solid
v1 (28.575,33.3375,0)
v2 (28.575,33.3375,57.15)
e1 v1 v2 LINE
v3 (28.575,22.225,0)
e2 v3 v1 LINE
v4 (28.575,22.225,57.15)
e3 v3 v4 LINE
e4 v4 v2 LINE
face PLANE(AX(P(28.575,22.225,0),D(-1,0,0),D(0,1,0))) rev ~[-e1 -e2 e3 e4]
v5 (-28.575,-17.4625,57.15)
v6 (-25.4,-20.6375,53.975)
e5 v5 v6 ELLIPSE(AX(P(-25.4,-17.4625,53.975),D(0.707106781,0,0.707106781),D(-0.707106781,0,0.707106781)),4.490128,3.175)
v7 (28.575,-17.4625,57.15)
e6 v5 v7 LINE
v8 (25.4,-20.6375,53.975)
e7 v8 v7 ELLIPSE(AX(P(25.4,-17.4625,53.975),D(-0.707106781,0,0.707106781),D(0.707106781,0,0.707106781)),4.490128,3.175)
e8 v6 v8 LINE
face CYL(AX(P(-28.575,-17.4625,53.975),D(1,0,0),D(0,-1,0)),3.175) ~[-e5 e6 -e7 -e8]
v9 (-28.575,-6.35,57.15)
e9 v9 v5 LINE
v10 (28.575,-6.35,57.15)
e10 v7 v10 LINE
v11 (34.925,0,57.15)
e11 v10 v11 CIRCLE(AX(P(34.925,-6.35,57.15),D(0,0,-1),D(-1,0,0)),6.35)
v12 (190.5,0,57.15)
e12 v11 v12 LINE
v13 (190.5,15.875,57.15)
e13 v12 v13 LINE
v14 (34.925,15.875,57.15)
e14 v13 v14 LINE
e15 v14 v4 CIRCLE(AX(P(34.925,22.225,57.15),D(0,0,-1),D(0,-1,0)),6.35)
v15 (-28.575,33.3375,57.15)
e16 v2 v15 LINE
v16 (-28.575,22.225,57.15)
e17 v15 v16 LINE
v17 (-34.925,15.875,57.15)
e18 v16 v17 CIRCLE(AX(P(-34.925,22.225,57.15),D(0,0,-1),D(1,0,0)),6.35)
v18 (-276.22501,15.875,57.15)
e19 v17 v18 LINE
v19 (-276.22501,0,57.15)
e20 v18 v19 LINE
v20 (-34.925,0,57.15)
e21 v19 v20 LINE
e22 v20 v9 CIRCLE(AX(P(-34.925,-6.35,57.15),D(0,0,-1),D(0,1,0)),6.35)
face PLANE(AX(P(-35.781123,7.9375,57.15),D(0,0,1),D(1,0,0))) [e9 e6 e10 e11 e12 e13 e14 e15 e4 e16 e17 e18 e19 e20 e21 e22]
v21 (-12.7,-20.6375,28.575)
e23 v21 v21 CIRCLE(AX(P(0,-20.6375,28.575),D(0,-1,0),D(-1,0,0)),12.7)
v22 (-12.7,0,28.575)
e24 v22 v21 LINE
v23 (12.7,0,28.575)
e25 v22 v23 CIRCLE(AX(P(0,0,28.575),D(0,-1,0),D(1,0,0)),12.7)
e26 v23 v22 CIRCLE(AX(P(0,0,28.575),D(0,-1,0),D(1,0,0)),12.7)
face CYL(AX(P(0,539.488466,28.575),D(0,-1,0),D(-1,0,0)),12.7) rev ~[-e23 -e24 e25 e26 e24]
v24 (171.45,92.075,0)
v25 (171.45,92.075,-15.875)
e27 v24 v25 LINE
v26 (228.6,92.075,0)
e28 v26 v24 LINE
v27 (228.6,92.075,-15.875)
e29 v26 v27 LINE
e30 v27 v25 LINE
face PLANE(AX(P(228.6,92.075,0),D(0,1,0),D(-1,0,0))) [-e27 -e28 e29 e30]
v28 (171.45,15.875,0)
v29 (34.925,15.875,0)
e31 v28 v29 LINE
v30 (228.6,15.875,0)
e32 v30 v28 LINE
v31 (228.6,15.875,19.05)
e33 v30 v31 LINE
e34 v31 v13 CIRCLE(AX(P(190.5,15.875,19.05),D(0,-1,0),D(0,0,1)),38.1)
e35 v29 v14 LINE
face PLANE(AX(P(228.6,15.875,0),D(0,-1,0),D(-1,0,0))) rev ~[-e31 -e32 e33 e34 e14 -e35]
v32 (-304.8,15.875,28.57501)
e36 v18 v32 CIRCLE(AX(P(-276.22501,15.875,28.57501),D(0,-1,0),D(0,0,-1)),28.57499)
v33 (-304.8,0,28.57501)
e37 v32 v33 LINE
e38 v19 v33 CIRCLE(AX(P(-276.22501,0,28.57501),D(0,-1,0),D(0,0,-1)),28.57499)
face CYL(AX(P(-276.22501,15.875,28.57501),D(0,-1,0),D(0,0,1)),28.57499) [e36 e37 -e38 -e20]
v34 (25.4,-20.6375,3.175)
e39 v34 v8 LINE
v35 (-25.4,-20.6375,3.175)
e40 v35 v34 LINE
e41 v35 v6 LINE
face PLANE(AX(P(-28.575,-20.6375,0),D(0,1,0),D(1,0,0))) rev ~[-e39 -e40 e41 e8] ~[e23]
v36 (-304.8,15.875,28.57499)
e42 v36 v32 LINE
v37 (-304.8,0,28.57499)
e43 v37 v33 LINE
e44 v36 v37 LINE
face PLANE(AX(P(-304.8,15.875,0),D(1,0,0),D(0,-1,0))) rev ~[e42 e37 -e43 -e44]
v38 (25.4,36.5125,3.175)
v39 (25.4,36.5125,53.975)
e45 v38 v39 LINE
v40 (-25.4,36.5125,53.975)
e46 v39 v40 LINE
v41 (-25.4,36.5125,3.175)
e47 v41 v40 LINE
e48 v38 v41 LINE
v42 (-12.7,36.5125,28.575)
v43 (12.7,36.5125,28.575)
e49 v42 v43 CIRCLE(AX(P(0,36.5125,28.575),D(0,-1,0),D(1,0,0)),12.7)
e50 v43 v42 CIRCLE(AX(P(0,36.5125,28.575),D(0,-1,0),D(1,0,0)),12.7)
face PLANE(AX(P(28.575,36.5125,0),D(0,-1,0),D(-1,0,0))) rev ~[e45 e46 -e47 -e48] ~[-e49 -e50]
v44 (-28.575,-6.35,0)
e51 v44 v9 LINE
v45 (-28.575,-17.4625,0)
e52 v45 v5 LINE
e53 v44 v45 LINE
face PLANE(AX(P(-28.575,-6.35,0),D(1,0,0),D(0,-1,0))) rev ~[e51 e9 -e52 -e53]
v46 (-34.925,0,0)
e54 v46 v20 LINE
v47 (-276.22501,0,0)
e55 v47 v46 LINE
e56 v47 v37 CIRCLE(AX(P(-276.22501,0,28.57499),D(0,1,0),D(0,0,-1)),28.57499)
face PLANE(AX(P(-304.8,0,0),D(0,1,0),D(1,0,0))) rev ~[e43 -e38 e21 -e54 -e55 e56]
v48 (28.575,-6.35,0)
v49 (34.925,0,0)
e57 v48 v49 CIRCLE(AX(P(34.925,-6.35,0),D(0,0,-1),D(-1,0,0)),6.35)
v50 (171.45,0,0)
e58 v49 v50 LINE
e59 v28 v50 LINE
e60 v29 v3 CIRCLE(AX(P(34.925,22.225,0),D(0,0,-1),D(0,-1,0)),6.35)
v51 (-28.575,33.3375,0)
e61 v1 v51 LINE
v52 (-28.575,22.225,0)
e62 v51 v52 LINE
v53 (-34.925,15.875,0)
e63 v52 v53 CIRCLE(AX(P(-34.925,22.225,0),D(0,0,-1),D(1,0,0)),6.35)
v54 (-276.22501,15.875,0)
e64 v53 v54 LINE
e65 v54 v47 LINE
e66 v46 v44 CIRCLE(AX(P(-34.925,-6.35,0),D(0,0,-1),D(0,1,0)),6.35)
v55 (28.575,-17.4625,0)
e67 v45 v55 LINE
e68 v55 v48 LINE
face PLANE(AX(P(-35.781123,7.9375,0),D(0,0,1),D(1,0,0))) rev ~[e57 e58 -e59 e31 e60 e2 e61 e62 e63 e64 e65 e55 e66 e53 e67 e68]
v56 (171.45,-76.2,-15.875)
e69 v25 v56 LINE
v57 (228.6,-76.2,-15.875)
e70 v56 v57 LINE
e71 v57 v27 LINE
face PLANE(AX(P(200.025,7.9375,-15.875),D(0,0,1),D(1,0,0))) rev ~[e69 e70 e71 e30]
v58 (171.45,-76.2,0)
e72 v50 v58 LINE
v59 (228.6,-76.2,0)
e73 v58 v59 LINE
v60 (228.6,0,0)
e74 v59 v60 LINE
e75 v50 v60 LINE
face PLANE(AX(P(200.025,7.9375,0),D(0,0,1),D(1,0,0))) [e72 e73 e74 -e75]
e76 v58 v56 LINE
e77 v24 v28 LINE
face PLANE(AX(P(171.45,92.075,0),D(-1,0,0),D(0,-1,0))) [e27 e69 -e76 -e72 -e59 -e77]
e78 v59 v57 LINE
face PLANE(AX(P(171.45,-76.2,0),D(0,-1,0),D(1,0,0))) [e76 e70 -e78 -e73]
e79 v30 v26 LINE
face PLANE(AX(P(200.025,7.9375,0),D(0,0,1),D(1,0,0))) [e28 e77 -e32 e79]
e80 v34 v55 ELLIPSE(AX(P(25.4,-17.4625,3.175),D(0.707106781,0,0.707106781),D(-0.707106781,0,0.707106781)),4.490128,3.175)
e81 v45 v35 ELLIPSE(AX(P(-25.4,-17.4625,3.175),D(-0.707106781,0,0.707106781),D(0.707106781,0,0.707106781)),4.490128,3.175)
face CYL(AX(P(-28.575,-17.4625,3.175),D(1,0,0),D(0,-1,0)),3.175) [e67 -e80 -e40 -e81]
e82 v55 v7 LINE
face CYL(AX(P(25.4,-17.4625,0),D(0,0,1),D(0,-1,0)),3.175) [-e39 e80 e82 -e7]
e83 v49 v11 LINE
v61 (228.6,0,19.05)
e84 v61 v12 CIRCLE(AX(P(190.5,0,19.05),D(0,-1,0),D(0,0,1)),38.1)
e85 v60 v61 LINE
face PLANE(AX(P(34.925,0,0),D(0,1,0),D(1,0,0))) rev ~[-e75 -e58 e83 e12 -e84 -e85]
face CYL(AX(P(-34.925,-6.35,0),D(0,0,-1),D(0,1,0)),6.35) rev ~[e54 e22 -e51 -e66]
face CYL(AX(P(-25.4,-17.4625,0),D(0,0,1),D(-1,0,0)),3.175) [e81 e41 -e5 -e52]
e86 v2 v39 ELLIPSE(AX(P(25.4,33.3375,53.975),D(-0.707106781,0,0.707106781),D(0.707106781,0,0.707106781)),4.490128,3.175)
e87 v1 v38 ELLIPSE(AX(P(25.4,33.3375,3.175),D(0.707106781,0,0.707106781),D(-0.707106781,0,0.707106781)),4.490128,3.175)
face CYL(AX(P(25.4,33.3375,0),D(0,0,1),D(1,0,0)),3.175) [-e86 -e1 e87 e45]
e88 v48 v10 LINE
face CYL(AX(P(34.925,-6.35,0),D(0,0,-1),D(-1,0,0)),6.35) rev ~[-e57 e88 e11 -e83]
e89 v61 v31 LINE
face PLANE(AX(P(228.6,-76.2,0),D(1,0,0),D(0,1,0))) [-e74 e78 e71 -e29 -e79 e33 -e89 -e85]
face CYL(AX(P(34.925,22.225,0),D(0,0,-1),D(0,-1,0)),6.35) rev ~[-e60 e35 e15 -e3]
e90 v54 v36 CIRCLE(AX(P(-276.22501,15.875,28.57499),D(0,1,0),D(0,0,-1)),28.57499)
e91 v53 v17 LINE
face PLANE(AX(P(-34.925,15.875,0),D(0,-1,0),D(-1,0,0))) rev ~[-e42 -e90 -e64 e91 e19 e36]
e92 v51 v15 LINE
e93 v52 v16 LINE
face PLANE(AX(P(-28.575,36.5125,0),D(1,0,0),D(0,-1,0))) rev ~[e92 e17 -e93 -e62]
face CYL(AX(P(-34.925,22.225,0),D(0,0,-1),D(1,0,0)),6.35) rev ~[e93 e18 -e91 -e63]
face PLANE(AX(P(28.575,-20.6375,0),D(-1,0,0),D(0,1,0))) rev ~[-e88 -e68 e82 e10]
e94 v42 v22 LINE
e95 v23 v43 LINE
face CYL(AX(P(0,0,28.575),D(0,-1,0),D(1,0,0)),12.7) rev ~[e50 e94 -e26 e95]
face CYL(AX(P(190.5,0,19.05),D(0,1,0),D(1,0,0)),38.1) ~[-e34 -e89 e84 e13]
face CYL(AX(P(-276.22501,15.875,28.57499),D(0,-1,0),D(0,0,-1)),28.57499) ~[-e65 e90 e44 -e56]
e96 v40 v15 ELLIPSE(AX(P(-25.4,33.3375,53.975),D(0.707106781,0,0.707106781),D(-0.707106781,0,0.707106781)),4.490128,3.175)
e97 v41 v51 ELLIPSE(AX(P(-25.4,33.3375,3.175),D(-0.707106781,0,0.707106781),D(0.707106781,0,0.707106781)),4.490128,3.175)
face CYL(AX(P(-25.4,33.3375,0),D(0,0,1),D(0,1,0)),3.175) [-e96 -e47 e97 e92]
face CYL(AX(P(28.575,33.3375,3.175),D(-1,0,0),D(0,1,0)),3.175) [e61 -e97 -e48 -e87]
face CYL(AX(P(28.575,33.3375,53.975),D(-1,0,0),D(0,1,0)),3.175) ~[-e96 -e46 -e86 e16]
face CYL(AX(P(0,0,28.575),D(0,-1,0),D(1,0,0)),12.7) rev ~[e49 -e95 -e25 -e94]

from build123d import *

# Parameters (mm, degrees)
F1_DEPTH = 57.15
F2_R     = 3.175
F3_R     = 28.57499
F5_D     = 25.4
F5_DEPTH = 38.1
F5_TIP   = 7.6309298617
F6_D     = 25.4
F7_R     = 38.1
F9_DEPTH = 15.875


# Not quite as in the source:
# - a fillet or chamfer is up to 0.001 mm smaller than in the source, because OpenCascade refuses the exact size
# - a length typed as a fraction of an inch, garbled in the dataset ("3 / 203.2 mm" for 3/8 in), is restored


with BuildPart() as f1:
    # F0 (on Top) → F1 (new body)
    with BuildSketch(Plane.XY):
        with BuildLine():
            ThreePointArc((28.575, -6.35), (30.4348719395, -1.8598719395), (34.925, 0))
            Line((34.925, 0), (228.6, 0))
            Line((228.6, 0), (228.6, 15.875))
            Line((228.6, 15.875), (34.925, 15.875))
            ThreePointArc((34.925, 15.875), (30.4348719395, 17.7348719395), (28.575, 22.225))
            Line((28.575, 22.225), (28.575, 36.5125))
            Line((28.575, 36.5125), (0, 36.5125))
            Line((0, 36.5125), (-28.575, 36.5125))
            Line((-28.575, 36.5125), (-28.575, 22.225))
            ThreePointArc((-28.575, 22.225), (-30.4348719395, 17.7348719395), (-34.925, 15.875))
            Line((-34.925, 15.875), (-304.8, 15.875))
            Line((-304.8, 15.875), (-304.8, 0))
            Line((-304.8, 0), (-34.925, 0))
            ThreePointArc((-34.925, 0), (-30.4348719395, -1.8598719395), (-28.575, -6.35))
            Line((-28.575, -6.35), (-28.575, -20.6375))
            Line((-28.575, -20.6375), (0, -20.6375))
            Line((0, -20.6375), (28.575, -20.6375))
            Line((28.575, -20.6375), (28.575, -6.35))
        make_face()
    extrude(amount=F1_DEPTH)

    # F2
    f2_edges = [f1.edges().sort_by_distance(p)[0] for p in [
        (28.575, 36.5125, 28.575),
        (0, 36.5125, 57.15),
        (-28.575, 36.5125, 28.575),
        (0, 36.5125, 0),
        (-28.575, -20.6375, 28.575),
        (0, -20.6375, 57.15),
        (28.575, -20.6375, 28.575),
        (0, -20.6375, 0),
    ]]
    fillet(f2_edges, radius=F2_R)

    # F3 (radius 28.575 in the source; OpenCascade refuses exactly that, so slightly less here)
    f3_edges = [f1.edges().sort_by_distance(p)[0] for p in [
        (-304.8, 7.9375, 57.15),
        (-304.8, 7.9375, 0),
    ]]
    fillet(f3_edges, radius=F3_R)

    # F5 (one way)
    with BuildSketch(Plane.XZ):
        with Locations((0, 28.575)):
            Circle(F5_D / 2)
    extrude(amount=-F5_DEPTH, mode=Mode.SUBTRACT)
    with Locations(Plane.XZ):
        with Locations((0, 28.575)):
            with Locations((0, 0, -(F5_DEPTH + F5_TIP / 2))):  # 118° drill point
                Cone(0, F5_D / 2, F5_TIP, mode=Mode.SUBTRACT)

    # F6 (through all)
    with Locations(Plane(origin=(0, 0, 0), x_dir=(1, 0, 0), z_dir=(0, 1, 0))):
        with Locations((0, -28.575)):
            Hole(F6_D / 2)

    # F7
    f7_edges = [f1.edges().sort_by_distance(p)[0] for p in [
        (228.6, 7.9375, 57.15),
    ]]
    fillet(f7_edges, radius=F7_R)

    # F8 (on Top) → F9 (join)
    with BuildSketch(Plane.XY):
        Polygon((228.6, -76.2), (228.6, 0), (228.6, 92.075), (171.45, 92.075), (171.45, -76.2), align=None)
    extrude(amount=-F9_DEPTH)


solid = f1.part
